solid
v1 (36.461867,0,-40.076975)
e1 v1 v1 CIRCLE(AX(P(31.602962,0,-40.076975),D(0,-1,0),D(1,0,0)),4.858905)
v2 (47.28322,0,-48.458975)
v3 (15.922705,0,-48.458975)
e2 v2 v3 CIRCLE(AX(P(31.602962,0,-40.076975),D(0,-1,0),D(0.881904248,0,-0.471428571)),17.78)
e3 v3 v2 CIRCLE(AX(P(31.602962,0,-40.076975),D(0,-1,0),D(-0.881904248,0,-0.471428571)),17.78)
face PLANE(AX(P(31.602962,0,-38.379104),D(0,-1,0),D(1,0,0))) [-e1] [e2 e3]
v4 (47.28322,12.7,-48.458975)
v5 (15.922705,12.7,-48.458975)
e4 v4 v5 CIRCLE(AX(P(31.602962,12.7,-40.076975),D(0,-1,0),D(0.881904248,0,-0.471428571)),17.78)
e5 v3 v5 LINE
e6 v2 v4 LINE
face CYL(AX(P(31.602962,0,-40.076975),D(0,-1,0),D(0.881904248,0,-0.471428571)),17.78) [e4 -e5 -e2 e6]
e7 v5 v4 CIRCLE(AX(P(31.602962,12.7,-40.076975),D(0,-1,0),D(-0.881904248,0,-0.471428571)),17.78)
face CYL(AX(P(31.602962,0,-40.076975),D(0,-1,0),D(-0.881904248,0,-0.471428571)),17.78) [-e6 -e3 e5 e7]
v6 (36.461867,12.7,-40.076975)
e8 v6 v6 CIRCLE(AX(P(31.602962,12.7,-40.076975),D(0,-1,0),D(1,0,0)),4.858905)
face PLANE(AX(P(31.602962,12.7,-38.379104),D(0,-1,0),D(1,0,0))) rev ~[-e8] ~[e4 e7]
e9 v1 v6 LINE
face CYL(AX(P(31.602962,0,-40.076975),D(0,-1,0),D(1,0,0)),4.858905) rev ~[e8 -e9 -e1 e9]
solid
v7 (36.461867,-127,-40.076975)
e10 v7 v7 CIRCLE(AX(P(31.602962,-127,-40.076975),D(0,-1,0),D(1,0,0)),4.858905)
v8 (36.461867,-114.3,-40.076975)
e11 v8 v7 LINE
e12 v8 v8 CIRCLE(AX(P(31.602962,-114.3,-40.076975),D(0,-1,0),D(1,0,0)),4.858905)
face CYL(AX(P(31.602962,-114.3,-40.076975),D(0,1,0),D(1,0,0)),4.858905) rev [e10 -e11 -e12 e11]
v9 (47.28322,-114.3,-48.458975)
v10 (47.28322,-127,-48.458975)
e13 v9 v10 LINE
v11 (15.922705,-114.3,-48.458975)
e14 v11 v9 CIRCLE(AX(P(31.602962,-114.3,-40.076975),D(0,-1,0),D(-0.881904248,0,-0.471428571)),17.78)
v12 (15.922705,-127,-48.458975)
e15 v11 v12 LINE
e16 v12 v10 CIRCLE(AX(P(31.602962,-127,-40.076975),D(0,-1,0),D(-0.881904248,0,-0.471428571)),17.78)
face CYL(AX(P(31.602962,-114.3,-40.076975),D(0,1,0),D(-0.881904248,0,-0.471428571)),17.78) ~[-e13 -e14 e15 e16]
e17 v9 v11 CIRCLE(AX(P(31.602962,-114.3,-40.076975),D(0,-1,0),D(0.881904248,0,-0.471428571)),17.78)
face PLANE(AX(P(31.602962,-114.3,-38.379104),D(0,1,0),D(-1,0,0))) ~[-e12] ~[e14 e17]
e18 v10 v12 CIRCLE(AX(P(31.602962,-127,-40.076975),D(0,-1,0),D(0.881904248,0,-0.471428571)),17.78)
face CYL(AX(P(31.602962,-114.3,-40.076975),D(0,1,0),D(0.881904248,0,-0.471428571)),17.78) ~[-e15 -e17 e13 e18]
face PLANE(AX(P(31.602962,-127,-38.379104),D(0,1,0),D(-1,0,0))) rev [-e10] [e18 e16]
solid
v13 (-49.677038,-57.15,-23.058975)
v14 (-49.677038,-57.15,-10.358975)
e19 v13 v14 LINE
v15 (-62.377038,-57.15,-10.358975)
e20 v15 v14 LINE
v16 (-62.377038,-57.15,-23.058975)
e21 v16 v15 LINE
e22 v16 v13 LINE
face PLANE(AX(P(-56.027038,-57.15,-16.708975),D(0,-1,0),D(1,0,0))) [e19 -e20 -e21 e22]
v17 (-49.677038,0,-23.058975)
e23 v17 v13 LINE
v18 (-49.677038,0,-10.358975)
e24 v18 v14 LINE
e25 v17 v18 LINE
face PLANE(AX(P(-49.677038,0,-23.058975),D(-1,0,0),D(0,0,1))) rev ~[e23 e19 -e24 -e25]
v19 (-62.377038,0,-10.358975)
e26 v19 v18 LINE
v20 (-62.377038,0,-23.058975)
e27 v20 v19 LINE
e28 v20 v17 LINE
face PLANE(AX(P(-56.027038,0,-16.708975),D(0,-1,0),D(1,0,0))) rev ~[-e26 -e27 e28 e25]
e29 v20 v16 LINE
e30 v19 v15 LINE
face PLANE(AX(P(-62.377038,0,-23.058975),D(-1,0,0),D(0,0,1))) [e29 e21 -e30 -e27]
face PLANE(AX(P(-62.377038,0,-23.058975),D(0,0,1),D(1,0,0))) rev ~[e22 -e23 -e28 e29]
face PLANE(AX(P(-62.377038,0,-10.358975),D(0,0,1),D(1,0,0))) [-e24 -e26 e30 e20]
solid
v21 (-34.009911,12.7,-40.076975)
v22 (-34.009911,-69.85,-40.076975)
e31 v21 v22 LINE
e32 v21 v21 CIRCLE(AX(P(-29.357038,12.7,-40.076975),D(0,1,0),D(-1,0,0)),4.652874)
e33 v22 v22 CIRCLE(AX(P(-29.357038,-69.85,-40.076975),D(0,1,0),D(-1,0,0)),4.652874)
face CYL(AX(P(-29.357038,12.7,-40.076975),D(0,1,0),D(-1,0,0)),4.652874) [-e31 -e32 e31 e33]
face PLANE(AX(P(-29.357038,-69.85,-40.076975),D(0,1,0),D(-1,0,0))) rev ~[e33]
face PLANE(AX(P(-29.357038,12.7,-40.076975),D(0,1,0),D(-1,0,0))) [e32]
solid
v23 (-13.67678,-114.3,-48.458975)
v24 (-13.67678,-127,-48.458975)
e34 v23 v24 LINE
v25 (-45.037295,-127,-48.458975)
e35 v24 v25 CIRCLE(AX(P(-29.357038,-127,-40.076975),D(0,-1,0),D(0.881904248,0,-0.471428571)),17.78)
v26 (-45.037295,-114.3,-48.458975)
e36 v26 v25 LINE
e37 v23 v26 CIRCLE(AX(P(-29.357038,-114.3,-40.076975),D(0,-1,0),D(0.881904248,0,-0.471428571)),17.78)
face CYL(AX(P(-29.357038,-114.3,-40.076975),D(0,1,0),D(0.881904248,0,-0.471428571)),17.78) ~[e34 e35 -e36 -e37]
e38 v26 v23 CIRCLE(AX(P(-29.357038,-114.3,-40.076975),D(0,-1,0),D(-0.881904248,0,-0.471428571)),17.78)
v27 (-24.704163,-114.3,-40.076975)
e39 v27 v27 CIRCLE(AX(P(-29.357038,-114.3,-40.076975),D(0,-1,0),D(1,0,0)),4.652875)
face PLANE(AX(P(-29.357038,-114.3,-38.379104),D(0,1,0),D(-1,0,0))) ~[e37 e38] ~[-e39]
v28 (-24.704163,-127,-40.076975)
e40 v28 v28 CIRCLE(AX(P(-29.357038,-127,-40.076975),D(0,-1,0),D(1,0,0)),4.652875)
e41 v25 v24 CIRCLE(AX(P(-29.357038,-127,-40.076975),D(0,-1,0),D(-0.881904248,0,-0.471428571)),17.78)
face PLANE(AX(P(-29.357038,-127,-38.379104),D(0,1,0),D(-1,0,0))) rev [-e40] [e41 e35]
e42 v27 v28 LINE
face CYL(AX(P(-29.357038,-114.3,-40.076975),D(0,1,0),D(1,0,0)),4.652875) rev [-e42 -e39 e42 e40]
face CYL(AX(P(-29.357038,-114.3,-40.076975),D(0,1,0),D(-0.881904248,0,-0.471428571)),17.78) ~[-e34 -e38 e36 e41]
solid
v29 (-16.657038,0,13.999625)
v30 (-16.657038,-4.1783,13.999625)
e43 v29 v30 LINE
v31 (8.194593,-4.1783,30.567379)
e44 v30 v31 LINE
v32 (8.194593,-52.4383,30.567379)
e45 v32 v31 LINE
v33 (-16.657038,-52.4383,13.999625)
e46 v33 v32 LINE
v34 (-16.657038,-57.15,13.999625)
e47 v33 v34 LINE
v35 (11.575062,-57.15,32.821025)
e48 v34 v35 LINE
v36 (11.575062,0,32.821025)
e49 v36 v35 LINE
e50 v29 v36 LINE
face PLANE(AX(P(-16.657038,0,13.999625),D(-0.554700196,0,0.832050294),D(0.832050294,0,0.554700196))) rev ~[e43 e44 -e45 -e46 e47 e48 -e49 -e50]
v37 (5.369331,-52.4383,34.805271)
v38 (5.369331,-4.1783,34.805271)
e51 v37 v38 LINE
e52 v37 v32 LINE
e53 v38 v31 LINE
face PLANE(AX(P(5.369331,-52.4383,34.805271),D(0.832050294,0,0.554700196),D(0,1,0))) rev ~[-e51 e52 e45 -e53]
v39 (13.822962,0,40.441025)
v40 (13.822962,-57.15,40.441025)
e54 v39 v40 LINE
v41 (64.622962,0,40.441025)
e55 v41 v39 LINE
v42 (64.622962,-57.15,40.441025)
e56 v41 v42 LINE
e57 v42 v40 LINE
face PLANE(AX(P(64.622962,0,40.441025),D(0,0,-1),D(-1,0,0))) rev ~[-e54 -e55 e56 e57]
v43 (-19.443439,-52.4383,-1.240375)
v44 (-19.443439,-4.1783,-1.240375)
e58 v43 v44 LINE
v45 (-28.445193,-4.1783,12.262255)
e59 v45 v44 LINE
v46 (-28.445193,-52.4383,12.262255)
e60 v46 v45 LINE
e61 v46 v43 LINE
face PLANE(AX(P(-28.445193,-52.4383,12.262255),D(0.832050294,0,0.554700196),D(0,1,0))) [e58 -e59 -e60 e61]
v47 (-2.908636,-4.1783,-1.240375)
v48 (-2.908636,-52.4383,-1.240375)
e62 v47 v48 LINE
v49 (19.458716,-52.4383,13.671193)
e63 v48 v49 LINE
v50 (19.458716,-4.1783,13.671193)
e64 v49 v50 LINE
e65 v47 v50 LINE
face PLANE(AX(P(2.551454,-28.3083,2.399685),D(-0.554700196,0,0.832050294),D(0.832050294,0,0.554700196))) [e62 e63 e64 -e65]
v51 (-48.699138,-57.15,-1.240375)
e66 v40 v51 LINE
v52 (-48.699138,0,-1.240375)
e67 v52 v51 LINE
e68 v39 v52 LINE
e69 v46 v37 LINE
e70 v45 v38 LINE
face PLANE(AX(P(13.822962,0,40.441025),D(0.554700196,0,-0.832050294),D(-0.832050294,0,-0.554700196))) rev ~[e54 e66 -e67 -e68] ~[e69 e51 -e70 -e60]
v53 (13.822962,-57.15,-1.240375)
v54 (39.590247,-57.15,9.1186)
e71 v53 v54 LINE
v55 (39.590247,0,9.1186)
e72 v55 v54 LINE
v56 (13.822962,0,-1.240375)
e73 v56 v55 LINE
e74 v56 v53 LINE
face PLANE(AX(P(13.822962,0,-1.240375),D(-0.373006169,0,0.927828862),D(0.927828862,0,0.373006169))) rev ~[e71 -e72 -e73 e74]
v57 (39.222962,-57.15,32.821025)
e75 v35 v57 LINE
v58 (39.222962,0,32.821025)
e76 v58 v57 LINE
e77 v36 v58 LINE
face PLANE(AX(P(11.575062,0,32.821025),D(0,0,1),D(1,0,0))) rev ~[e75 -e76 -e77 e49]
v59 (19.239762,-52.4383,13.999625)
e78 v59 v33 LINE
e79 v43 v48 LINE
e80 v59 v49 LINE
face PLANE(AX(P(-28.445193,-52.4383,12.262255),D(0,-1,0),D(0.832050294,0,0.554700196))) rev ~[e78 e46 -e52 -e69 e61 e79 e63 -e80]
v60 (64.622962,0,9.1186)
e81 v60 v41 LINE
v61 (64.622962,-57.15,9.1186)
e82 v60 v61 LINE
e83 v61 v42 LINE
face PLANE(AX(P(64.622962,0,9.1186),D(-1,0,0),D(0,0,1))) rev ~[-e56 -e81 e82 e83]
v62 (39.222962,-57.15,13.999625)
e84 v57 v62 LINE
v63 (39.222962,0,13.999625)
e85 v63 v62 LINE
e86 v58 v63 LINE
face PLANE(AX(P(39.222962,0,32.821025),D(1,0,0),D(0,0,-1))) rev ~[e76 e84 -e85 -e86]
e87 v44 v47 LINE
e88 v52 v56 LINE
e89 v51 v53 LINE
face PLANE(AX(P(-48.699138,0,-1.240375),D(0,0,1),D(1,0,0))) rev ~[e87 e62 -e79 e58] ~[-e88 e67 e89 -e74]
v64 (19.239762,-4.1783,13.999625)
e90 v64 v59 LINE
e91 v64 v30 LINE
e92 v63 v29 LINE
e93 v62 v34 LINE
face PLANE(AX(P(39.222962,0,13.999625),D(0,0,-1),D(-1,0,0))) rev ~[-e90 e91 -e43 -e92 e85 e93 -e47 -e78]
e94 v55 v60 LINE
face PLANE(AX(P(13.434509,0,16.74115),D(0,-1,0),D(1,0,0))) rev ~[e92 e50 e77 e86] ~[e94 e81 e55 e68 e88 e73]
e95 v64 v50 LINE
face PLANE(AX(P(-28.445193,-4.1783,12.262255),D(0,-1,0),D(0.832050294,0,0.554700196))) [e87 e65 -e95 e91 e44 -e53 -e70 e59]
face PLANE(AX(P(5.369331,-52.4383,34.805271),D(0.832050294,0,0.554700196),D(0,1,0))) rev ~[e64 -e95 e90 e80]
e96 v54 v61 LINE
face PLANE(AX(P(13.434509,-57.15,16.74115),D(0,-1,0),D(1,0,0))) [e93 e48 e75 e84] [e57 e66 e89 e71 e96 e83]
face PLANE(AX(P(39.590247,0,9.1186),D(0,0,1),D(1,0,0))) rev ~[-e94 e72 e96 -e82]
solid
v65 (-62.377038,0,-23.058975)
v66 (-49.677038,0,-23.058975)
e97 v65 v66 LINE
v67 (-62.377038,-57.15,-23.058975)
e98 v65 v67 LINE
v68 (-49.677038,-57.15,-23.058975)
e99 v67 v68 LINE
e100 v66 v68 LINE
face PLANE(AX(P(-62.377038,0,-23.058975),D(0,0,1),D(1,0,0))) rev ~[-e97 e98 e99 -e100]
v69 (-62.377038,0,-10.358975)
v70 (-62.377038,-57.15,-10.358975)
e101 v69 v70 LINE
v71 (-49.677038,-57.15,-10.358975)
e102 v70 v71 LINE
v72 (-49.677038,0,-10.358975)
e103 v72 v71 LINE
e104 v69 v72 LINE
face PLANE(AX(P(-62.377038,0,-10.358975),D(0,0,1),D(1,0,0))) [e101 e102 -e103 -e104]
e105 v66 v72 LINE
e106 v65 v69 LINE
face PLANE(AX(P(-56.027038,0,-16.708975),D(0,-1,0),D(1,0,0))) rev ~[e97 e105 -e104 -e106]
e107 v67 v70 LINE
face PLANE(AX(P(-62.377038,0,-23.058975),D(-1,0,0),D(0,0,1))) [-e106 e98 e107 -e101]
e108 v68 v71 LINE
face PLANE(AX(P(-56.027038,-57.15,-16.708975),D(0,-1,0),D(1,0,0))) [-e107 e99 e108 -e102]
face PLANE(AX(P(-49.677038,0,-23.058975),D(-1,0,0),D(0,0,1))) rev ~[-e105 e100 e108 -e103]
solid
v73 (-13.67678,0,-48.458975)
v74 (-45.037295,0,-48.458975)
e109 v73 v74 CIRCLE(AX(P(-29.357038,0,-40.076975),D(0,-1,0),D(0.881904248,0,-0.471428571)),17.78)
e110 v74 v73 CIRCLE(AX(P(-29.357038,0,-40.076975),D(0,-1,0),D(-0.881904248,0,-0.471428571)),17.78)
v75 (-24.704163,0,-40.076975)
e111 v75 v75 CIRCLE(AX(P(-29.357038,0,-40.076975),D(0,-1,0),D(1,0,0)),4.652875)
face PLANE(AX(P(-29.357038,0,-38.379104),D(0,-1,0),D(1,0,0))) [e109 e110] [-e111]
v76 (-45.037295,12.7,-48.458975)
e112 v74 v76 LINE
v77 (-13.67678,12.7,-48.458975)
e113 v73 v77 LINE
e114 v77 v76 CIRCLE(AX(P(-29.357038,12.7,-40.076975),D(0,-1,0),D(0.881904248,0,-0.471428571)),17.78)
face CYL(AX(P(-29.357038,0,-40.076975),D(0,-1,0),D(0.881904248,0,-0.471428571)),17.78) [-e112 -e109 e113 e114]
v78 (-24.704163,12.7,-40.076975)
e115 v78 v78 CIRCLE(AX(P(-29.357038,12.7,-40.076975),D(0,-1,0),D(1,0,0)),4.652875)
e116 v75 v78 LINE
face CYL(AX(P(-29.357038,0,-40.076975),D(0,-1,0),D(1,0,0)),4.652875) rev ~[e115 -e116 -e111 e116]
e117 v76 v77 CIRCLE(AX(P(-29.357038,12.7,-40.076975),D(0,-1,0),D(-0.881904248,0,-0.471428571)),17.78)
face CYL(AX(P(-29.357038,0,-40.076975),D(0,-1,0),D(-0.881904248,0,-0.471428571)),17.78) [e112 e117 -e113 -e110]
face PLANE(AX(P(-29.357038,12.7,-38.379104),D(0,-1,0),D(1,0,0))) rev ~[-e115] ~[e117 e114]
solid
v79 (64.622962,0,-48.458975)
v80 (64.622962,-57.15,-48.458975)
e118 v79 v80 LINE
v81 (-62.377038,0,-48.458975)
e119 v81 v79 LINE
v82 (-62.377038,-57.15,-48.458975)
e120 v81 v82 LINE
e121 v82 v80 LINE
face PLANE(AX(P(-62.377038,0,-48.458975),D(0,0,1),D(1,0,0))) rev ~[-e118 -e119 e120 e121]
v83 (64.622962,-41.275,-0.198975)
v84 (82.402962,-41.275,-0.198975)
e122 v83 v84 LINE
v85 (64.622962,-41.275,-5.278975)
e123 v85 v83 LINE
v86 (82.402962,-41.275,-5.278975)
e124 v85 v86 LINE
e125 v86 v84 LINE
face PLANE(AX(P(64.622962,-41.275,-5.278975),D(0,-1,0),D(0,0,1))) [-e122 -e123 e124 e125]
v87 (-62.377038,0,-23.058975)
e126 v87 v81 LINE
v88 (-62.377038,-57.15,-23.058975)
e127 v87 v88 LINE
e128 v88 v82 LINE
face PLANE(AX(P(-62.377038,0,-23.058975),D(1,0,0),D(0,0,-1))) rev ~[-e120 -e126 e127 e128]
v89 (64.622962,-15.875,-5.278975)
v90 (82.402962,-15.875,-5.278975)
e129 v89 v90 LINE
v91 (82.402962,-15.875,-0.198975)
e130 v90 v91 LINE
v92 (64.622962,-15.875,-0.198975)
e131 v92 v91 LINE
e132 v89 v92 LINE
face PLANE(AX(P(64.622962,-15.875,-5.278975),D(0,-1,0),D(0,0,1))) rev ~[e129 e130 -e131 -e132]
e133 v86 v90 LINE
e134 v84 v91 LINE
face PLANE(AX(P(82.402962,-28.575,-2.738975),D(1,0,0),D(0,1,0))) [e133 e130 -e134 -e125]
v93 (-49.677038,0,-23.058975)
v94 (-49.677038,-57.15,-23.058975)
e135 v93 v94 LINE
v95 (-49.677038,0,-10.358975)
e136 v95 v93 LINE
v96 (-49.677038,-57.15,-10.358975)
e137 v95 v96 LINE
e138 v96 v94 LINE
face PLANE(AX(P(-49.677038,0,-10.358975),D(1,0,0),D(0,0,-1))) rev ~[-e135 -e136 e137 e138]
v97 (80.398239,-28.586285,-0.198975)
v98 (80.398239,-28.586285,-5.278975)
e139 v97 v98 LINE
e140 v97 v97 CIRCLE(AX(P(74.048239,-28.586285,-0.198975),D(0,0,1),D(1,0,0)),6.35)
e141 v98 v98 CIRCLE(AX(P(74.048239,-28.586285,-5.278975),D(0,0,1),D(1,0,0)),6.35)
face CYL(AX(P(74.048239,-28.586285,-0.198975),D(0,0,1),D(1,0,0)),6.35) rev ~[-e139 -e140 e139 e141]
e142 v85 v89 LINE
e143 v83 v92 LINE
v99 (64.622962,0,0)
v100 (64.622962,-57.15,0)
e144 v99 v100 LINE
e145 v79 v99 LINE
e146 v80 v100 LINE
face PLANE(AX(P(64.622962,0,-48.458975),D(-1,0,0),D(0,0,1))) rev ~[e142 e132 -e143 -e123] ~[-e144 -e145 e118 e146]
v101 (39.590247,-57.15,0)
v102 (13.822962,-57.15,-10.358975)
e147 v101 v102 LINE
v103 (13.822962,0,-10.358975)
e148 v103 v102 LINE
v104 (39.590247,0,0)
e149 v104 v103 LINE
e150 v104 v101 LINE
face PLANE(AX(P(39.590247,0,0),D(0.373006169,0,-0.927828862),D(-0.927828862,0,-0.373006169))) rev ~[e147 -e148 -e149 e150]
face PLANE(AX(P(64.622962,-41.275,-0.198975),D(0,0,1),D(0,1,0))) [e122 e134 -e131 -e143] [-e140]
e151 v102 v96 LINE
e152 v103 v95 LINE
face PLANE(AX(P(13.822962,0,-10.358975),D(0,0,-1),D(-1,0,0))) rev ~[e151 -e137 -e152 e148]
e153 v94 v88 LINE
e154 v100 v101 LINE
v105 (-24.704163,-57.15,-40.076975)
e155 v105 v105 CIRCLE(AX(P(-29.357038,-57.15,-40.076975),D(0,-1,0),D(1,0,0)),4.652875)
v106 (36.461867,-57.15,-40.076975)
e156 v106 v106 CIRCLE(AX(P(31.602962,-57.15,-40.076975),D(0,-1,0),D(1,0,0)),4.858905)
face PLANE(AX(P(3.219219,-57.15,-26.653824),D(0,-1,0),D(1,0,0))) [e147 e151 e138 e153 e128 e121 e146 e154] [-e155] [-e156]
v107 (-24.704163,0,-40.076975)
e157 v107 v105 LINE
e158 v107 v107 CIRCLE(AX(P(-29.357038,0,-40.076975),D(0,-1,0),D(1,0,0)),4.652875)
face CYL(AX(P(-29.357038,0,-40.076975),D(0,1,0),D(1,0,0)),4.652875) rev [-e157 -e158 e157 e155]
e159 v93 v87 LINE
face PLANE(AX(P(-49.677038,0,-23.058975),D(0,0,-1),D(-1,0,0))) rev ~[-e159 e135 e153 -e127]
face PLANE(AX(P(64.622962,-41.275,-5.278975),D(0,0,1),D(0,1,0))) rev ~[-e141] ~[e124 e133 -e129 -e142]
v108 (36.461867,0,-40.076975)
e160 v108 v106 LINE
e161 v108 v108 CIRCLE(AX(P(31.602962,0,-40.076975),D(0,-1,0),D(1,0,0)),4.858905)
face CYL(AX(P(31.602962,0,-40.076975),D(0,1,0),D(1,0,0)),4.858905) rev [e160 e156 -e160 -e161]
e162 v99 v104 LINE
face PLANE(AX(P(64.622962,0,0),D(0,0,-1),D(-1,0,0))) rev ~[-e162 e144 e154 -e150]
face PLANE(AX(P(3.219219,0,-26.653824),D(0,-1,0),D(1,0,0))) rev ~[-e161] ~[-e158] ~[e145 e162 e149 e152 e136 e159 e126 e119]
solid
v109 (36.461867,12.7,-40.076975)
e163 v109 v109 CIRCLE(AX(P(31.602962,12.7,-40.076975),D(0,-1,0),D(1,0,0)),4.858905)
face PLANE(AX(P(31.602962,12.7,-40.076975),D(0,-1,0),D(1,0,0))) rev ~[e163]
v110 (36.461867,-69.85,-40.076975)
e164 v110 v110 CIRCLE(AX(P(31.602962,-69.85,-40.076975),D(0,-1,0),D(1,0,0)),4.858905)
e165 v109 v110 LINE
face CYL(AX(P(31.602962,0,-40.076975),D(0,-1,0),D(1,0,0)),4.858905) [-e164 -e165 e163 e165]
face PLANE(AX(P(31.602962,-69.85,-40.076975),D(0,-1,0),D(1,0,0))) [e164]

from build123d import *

# Parameters (mm, degrees)
F1_DEPTH       = 57.15
F0_R           = 4.6528750416
F0_R_2         = 4.8589048732
F0_W           = 12.7
F0_H           = 12.7
F2_DEPTH       = 57.15
F3_DEPTH       = 57.15
F4_DEPTH       = 12.7
F6_W           = 40.64
F6_H           = 48.26
F7_DEPTH       = 25.4
F8_W           = 25.4
F8_H           = 5.08
F9_DEPTH       = 17.78
F10_R          = 6.35
F11_DEPTH      = 25.4
F12_R          = 4.6528736
F13_DEPTH      = 82.55
F14_DEPTH      = 69.85
F14_DEPTH_BACK = 12.7


# Not quite as in the source:
# - a feature names something its author has since deleted; it is built from what else it names


with BuildPart() as f1:
    # F0 (on Front) → F1 (new body)
    with BuildSketch(Plane.XZ):
        Polygon((64.6229624206, 40.4410248846), (13.8229624206, 40.4410248846), (-48.6991375794, -1.2403751154), (13.8229624206, -1.2403751154), (39.5902469754, 9.1186), (64.6229624206, 9.1186), align=None)
        Polygon((39.2229624206, 32.8210248846), (39.2229624206, 13.9996248846), (-16.6570375794, 13.9996248846), (11.5750624206, 32.8210248846), align=None, mode=Mode.SUBTRACT)
    extrude(amount=F1_DEPTH)

    # F6 (on face) → F7 (cut)
    with BuildSketch(Plane(origin=(-14.4118692019, 0, 21.6178038029), x_dir=(0.8320502943, 0, 0.5547001962), z_dir=(-0.5547001962, 0, 0.8320502943))):
        with Locations((3.4540443897, -28.3083)):
            Rectangle(F6_W, F6_H)
    extrude(amount=-F7_DEPTH, mode=Mode.SUBTRACT)


with BuildPart() as f1b:
    # F0 (on Front) → F1, piece 2 (new body)
    with BuildSketch(Plane.XZ):
        with BuildLine():
            Line((64.6229624206, -48.4589751154), (64.6229624206, 0))
            Line((64.6229624206, 0), (39.5902469754, 0))
            Line((39.5902469754, 0), (13.8229624206, -10.3589751154))
            Line((13.8229624206, -10.3589751154), (-49.6770375794, -10.3589751154))
            Line((-49.6770375794, -10.3589751154), (-49.6770375794, -23.0589751154))
            Line((-49.6770375794, -23.0589751154), (-62.3770375794, -23.0589751154))
            Line((-62.3770375794, -23.0589751154), (-62.3770375794, -48.4589751154))
            Line((-62.3770375794, -48.4589751154), (-45.0372951028, -48.4589751154))
            ThreePointArc((-45.0372951028, -48.4589751154), (-33.6775364646, -22.8298974098), (-11.5770375794, -40.0769751154))
            ThreePointArc((-11.5770375794, -40.0769751154), (-12.1099598738, -44.3974740006), (-13.676780056, -48.4589751154))
            Line((-13.676780056, -48.4589751154), (15.9227048972, -48.4589751154))
            ThreePointArc((15.9227048972, -48.4589751154), (27.2824635354, -22.8298974098), (49.3829624206, -40.0769751154))
            ThreePointArc((49.3829624206, -40.0769751154), (48.8500401262, -44.3974740006), (47.283219944, -48.4589751154))
            Line((47.283219944, -48.4589751154), (64.6229624206, -48.4589751154))
        make_face()
        with BuildLine():
            ThreePointArc((-11.5770375794, -40.0769751154), (-33.6775364646, -22.8298974098), (-45.0372951028, -48.4589751154))
            Line((-45.0372951028, -48.4589751154), (-13.676780056, -48.4589751154))
            ThreePointArc((-13.676780056, -48.4589751154), (-12.1099598738, -44.3974740006), (-11.5770375794, -40.0769751154))
        make_face()
        with Locations((-29.3570375794, -40.0769751154)):
            Circle(F0_R, mode=Mode.SUBTRACT)
        with BuildLine():
            Line((15.9227048972, -48.4589751154), (47.283219944, -48.4589751154))
            ThreePointArc((47.283219944, -48.4589751154), (48.8500401262, -44.3974740006), (49.3829624206, -40.0769751154))
            ThreePointArc((49.3829624206, -40.0769751154), (27.2824635354, -22.8298974098), (15.9227048972, -48.4589751154))
        make_face()
        with Locations((31.6029624206, -40.0769751154)):
            Circle(F0_R_2, mode=Mode.SUBTRACT)
    extrude(amount=F1_DEPTH)

    # F8 (on face) → F9 (join)
    with BuildSketch(Plane.YZ.offset(64.6229624206)):
        with Locations((-28.575, -2.7389751154)):
            Rectangle(F8_W, F8_H)
    extrude(amount=F9_DEPTH)

    # F10 (on face) → F11 (cut)
    with BuildSketch(Plane.XY.offset(-0.1989751154)):
        with Locations((74.0482390532, -28.5862853714)):
            Circle(F10_R)
    extrude(amount=-F11_DEPTH, mode=Mode.SUBTRACT)


with BuildPart() as f2:
    # F0 (on Front) → F2 (new body)
    with BuildSketch(Plane.XZ):
        with Locations((-56.0270375794, -16.7089751154)):
            Rectangle(F0_W, F0_H)
    extrude(amount=F2_DEPTH)


with BuildPart() as f3:
    # F0 (on Front) → F3 (new body)
    with BuildSketch(Plane.XZ):
        with Locations((-56.0270375794, -16.7089751154)):
            Rectangle(F0_W, F0_H)
    extrude(amount=F3_DEPTH)


with BuildPart() as f4:
    # F0 (on Front) → F4 (new body)
    with BuildSketch(Plane.XZ):
        with BuildLine():
            ThreePointArc((-11.5770375794, -40.0769751154), (-33.6775364646, -22.8298974098), (-45.0372951028, -48.4589751154))
            Line((-45.0372951028, -48.4589751154), (-13.676780056, -48.4589751154))
            ThreePointArc((-13.676780056, -48.4589751154), (-12.1099598738, -44.3974740006), (-11.5770375794, -40.0769751154))
        make_face()
        with Locations((-29.3570375794, -40.0769751154)):
            Circle(F0_R, mode=Mode.SUBTRACT)
        with BuildLine():
            Line((-13.676780056, -48.4589751154), (-45.0372951028, -48.4589751154))
            ThreePointArc((-45.0372951028, -48.4589751154), (-29.3570375794, -57.8569751154), (-13.676780056, -48.4589751154))
        make_face()
    extrude(amount=-F4_DEPTH)


with BuildPart() as f4b:
    # F0 (on Front) → F4, piece 2 (new body)
    with BuildSketch(Plane.XZ):
        with BuildLine():
            Line((15.9227048972, -48.4589751154), (47.283219944, -48.4589751154))
            ThreePointArc((47.283219944, -48.4589751154), (48.8500401262, -44.3974740006), (49.3829624206, -40.0769751154))
            ThreePointArc((49.3829624206, -40.0769751154), (27.2824635354, -22.8298974098), (15.9227048972, -48.4589751154))
        make_face()
        with Locations((31.6029624206, -40.0769751154)):
            Circle(F0_R_2, mode=Mode.SUBTRACT)
        with BuildLine():
            ThreePointArc((15.9227048972, -48.4589751154), (31.6029624206, -57.8569751154), (47.283219944, -48.4589751154))
            Line((47.283219944, -48.4589751154), (15.9227048972, -48.4589751154))
        make_face()
    extrude(amount=-F4_DEPTH)


with BuildPart() as f5_1:
    # F5: instance of F4b
    add(f4b.part.mirror(Plane(origin=(6.4473087682, -57.15, -27.6324476471), x_dir=(1, 0, 0), z_dir=(0, -1, 0))))


with BuildPart() as f5_2:
    # F5: instance of F4
    add(f4.part.mirror(Plane(origin=(6.4473087682, -57.15, -27.6324476471), x_dir=(1, 0, 0), z_dir=(0, -1, 0))))


with BuildPart() as f13:
    # F12 (on face) → F13 (new body)
    with BuildSketch(Plane(origin=(0, 12.7, 0), x_dir=(-1, 0, 0), z_dir=(0, 1, 0))):
        with Locations((29.3570375794, -40.0769751154)):
            Circle(F12_R)
    extrude(amount=-F13_DEPTH)


with BuildPart() as f14:
    # F0 (on Front) → F14 (new body, two sides)
    with BuildSketch(Plane.XZ) as f14_sk:
        with Locations((31.6029624206, -40.0769751154)):
            Circle(F0_R_2)
    extrude(amount=F14_DEPTH)
    extrude(f14_sk.sketch, amount=-F14_DEPTH_BACK)


solid = Compound([f1.part, f1b.part, f2.part, f3.part, f4.part, f4b.part, f5_1.part, f5_2.part, f13.part, f14.part])
